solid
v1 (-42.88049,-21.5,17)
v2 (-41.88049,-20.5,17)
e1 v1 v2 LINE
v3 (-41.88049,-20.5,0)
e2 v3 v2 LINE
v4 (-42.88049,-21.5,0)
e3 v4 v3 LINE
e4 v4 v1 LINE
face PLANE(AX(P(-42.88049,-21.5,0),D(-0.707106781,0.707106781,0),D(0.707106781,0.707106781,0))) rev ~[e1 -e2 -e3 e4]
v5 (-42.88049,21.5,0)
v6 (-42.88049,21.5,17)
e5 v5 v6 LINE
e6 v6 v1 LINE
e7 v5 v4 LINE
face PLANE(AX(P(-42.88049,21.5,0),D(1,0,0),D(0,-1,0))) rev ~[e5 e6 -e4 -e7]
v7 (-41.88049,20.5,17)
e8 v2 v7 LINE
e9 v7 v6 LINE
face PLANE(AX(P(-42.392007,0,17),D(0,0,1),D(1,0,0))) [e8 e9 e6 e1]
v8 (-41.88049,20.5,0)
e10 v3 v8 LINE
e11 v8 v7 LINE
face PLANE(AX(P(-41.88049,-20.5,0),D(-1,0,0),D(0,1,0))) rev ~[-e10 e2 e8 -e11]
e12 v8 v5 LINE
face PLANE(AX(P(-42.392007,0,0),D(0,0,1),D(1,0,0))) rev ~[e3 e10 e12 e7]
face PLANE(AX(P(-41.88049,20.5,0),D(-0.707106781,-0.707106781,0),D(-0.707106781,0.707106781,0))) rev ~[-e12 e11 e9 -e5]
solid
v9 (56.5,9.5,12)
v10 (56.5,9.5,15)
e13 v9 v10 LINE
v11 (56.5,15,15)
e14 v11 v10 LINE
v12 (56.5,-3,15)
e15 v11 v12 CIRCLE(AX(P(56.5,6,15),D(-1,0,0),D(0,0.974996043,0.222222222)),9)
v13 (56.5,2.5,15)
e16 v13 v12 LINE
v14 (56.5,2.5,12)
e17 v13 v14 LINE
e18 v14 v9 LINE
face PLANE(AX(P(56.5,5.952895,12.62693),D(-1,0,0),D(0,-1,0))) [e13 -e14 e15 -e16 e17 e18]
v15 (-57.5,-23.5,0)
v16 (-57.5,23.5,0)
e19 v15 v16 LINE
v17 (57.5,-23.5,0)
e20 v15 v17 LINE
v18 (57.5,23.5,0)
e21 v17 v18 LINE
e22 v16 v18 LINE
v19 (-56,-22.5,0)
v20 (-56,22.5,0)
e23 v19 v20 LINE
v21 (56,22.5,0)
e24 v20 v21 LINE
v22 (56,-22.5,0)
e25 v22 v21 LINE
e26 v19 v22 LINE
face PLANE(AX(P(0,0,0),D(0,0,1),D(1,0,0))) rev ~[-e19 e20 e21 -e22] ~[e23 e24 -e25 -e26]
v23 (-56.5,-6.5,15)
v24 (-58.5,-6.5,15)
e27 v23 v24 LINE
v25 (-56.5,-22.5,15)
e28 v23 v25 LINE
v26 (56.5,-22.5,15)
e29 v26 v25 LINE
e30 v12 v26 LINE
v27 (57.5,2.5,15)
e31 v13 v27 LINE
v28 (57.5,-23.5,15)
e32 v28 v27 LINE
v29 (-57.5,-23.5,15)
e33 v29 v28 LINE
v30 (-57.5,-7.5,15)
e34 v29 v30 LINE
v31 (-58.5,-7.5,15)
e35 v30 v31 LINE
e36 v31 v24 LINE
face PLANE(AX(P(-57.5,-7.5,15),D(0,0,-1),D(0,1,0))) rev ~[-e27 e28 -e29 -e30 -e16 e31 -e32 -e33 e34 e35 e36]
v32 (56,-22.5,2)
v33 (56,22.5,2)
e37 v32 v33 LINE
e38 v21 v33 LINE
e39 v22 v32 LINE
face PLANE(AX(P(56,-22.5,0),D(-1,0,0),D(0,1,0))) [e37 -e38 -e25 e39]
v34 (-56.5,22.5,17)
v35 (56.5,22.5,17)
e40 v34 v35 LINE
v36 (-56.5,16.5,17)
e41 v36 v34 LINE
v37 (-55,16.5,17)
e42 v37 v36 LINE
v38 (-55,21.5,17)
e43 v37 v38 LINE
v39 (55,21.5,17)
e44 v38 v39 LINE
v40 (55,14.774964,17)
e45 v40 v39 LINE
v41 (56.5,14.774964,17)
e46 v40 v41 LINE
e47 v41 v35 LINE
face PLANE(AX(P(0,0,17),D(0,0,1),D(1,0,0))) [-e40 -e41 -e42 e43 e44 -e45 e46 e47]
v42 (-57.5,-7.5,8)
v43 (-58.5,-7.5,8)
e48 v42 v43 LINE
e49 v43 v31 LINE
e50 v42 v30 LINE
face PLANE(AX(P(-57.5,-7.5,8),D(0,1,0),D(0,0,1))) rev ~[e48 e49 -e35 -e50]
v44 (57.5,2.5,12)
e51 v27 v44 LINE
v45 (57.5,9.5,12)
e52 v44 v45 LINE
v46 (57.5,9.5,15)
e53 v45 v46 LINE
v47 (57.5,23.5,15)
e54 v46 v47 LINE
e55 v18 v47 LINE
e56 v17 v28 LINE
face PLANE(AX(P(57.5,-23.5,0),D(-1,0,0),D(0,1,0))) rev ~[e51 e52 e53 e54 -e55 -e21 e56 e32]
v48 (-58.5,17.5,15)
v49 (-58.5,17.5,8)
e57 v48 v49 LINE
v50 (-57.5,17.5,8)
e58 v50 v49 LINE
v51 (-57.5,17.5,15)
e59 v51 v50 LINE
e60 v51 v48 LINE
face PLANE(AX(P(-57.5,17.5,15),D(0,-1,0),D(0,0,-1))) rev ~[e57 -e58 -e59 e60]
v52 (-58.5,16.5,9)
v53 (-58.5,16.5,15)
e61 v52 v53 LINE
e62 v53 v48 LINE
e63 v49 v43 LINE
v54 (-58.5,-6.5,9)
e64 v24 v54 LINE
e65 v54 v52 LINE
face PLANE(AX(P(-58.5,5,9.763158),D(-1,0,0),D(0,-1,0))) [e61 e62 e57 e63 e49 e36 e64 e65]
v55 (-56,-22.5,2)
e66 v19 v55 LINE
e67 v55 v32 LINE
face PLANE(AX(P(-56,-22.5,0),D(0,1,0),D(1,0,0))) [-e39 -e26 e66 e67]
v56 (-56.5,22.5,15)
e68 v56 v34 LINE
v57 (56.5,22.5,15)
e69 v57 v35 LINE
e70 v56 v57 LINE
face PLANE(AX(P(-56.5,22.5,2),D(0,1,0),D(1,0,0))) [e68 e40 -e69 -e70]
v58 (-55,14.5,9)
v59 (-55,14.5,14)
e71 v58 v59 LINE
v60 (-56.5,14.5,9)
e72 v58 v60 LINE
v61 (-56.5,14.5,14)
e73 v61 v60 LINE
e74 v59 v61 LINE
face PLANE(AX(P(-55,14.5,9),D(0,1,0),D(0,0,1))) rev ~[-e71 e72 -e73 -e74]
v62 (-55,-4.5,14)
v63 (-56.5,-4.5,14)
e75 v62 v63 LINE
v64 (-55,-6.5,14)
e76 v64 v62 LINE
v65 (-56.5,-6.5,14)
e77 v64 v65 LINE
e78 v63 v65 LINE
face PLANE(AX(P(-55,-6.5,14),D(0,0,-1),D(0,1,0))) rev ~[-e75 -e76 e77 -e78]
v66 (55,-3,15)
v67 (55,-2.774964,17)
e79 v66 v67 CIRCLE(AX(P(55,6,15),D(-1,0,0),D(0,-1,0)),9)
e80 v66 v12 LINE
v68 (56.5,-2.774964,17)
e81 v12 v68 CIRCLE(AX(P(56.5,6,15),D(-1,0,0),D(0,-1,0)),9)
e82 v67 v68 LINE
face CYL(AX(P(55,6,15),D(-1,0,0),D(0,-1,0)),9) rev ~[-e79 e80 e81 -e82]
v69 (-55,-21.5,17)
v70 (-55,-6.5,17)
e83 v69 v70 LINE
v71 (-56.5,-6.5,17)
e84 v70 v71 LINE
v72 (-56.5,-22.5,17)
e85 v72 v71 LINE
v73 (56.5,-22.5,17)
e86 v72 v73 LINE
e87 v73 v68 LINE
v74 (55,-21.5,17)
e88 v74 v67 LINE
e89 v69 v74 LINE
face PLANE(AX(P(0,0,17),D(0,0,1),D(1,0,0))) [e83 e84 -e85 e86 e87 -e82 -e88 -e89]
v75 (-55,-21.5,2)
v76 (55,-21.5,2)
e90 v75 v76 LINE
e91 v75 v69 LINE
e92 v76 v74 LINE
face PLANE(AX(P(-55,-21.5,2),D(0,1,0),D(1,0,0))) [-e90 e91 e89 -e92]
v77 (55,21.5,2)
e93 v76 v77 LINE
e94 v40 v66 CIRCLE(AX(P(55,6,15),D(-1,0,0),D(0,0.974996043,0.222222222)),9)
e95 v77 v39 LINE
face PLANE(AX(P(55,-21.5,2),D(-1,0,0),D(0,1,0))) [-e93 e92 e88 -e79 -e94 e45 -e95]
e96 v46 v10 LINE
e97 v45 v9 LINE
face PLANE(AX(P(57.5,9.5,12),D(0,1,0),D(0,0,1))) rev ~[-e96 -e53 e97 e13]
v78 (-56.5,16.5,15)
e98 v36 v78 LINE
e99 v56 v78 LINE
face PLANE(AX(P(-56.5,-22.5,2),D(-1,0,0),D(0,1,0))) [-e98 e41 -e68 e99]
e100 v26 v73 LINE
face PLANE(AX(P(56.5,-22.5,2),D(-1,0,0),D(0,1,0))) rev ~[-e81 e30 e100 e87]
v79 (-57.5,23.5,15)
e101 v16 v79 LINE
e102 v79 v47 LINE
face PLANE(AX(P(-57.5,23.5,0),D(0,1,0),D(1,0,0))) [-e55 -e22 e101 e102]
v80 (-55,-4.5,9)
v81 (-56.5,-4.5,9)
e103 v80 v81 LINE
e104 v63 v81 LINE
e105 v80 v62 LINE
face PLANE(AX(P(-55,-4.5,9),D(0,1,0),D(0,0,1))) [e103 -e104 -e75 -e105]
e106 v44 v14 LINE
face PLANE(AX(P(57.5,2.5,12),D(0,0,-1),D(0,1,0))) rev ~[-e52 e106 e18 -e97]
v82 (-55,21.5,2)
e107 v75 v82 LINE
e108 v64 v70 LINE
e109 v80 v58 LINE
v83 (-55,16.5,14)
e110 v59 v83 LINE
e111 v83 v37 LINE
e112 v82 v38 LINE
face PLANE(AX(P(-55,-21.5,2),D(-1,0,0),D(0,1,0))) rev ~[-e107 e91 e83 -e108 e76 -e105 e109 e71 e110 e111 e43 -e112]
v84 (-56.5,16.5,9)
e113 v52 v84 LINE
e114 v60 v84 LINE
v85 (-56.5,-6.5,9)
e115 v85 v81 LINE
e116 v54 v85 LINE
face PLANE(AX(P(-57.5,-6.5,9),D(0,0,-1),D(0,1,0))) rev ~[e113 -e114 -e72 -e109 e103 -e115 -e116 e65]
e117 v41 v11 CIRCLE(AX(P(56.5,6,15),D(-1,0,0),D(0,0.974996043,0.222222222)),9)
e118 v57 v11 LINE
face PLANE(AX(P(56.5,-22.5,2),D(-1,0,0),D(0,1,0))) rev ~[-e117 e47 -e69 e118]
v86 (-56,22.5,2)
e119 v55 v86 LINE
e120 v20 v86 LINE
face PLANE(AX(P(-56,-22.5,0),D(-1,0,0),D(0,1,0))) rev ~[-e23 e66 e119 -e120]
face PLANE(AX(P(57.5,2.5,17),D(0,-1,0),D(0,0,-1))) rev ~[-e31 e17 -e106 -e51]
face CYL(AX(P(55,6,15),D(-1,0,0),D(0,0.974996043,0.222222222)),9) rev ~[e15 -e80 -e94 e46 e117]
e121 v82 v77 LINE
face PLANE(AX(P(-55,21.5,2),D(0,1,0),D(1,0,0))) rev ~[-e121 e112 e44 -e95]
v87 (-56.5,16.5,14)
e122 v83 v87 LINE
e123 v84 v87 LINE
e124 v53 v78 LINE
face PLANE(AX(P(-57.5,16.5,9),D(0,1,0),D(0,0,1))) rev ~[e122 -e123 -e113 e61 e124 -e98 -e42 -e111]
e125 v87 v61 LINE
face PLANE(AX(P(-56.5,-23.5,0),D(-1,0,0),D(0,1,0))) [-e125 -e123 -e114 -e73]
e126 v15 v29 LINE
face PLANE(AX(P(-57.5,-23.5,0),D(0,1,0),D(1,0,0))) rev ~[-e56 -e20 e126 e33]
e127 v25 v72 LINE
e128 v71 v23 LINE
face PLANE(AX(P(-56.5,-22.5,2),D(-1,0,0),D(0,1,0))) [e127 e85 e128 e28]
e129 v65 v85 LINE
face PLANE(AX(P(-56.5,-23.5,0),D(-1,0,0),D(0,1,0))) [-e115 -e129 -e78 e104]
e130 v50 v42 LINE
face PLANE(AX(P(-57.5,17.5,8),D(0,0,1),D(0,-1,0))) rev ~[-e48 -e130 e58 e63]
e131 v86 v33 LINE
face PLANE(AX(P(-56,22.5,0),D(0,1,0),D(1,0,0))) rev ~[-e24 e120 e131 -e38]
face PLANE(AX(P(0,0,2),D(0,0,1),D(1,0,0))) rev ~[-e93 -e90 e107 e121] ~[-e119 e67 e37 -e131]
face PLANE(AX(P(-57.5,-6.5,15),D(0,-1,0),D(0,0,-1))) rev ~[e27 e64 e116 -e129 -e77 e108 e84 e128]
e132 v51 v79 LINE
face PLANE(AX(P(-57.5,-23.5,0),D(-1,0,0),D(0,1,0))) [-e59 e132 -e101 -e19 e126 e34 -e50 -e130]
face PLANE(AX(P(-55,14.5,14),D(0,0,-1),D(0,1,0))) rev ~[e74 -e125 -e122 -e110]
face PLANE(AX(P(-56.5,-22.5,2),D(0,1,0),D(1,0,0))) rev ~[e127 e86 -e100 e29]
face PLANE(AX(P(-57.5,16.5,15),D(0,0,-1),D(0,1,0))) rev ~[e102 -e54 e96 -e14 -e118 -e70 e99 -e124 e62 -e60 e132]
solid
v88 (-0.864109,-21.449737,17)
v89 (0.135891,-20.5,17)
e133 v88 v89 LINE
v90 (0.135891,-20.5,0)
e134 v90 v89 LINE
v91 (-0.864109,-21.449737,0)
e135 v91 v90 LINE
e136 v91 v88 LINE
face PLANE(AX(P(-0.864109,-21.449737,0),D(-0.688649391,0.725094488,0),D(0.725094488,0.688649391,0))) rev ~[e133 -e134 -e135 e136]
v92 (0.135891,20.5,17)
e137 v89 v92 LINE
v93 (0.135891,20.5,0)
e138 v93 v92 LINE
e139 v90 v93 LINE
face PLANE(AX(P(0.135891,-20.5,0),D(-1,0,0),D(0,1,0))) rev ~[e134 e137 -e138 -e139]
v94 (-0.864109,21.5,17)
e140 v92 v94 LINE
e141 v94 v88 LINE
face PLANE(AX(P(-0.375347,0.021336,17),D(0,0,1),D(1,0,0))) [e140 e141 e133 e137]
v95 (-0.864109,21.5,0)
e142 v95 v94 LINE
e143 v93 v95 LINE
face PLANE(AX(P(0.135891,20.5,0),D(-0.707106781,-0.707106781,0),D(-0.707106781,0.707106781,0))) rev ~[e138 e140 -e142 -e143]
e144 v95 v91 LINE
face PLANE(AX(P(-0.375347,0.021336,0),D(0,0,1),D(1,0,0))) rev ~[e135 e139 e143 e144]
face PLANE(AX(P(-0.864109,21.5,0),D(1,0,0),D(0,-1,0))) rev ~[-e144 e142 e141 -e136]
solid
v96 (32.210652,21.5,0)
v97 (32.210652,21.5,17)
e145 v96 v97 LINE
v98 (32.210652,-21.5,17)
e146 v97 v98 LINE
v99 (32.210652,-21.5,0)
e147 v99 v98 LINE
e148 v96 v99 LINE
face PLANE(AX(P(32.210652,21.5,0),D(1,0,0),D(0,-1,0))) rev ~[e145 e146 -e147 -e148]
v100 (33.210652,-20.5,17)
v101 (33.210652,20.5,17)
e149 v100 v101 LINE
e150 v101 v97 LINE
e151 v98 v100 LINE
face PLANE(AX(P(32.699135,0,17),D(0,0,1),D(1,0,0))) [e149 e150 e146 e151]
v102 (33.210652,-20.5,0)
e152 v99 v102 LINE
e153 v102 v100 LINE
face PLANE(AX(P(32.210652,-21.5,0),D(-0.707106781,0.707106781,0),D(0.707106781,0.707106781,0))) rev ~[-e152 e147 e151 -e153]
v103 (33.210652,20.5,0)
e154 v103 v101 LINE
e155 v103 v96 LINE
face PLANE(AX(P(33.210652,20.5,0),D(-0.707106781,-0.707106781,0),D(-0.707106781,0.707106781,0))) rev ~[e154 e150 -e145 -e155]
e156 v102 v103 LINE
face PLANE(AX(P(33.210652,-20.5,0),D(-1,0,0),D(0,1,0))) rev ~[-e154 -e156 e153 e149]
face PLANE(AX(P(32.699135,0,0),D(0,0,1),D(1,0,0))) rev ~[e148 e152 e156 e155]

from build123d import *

# Parameters (mm, degrees)
F0_W      = 115
F0_H      = 47
F0_W_2    = 112
F0_H_2    = 45
F1_DEPTH  = 15
F3_W      = 113
F3_H      = 45
F3_W_2    = 110
F3_H_2    = 43
F4_DEPTH  = 15
F5_W      = 7
F5_H      = 2
F5_H_2    = 3
F6_DEPTH  = 25
F8_DEPTH  = 1.5
F9_W      = 2
F9_H      = 3
F9_W_2    = 19
F9_H_2    = 5
F10_DEPTH = 25
F12_DEPTH = 1
F13_DEPTH = 1
F15_DEPTH = 17


with BuildPart() as f1:
    # F0 (on Top) → F1 (new body)
    with BuildSketch(Plane.XY):
        Rectangle(F0_W, F0_H)
        Rectangle(F0_W_2, F0_H_2, mode=Mode.SUBTRACT)
    extrude(amount=F1_DEPTH)

    # F3 (on offset) → F4 (join)
    with BuildSketch(Plane.XY.offset(2)):
        Rectangle(F3_W, F3_H)
        Rectangle(F3_W_2, F3_H_2, mode=Mode.SUBTRACT)
    extrude(amount=F4_DEPTH)

    # F5 (on face) → F6 (cut)
    with BuildSketch(Plane.YZ.offset(57.5)):
        with Locations((6, 16)):
            Rectangle(F5_W, F5_H)
        with Locations((6, 13.5)):
            Rectangle(F5_W, F5_H_2)
    extrude(amount=-F6_DEPTH, mode=Mode.SUBTRACT)

    # F7 (on face) → F8 (cut)
    with BuildSketch(Plane(origin=(55, 0, 0), x_dir=(0, -1, 0), z_dir=(-1, 0, 0))):
        with BuildLine():
            ThreePointArc((-14.7749643874, 17), (-7.0063102189, 6.0564358479), (3, 15))
            ThreePointArc((3, 15), (2.9435641521, 16.0063102189), (2.7749643874, 17))
            Line((2.7749643874, 17), (-2.5, 17))
            Line((-2.5, 17), (-2.5, 12))
            Line((-2.5, 12), (-9.5, 12))
            Line((-9.5, 12), (-9.5, 17))
            Line((-9.5, 17), (-14.7749643874, 17))
        make_face()
        with BuildLine():
            Line((-2.5, 17), (2.7749643874, 17))
            ThreePointArc((2.7749643874, 17), (-6, 24), (-14.7749643874, 17))
            Line((-14.7749643874, 17), (-9.5, 17))
            Line((-9.5, 17), (-9.5, 12))
            Line((-9.5, 12), (-2.5, 12))
            Line((-2.5, 12), (-2.5, 17))
        make_face()
    extrude(amount=-F8_DEPTH, mode=Mode.SUBTRACT)

    # F9 (on face) → F10 (cut)
    with BuildSketch(Plane.YZ.offset(-55)):
        with Locations((-5.5, 15.5)):
            Rectangle(F9_W, F9_H)
        with Locations((5, 11.5)):
            Rectangle(F9_W_2, F9_H_2)
        with Locations((15.5, 15.5)):
            Rectangle(F9_W, F9_H)
        with Locations((5, 15.5)):
            Rectangle(F9_W_2, F9_H)
    extrude(amount=-F10_DEPTH, mode=Mode.SUBTRACT)

    # F11 (on face) → F12 (join)
    with BuildSketch(Plane(origin=(-57.5, 0, 0), x_dir=(0, -1, 0), z_dir=(-1, 0, 0))):
        Polygon((-16.5, 15), (-17.5, 15), (-17.5, 8), (7.5, 8), (7.5, 15), (6.5, 15), (6.5, 14), (6.5, 9), (4.5, 9), (-14.5, 9), (-16.5, 9), (-16.5, 14), align=None)
    extrude(amount=F12_DEPTH)

    # F13 (cut): faces of the model
    f13_faces = [f1.faces().sort_by_distance(p)[0] for p in [
        (-57.5, 15.5, 11.5),
        (-57.5, -5.5, 11.5),
    ]]
    extrude(f13_faces, amount=-F13_DEPTH, mode=Mode.SUBTRACT)


with BuildPart() as f15:
    # F14 (on Top) → F15 (new body)
    with BuildSketch(Plane.XY):
        Polygon((-41.8804898377, 20.5), (-42.8804898377, 21.5), (-42.8804898377, -21.5), (-41.8804898377, -20.5), align=None)
    extrude(amount=F15_DEPTH)


with BuildPart() as f15b:
    # F14 (on Top) → F15, piece 2 (new body)
    with BuildSketch(Plane.XY):
        Polygon((0.1358912904, 20.5), (-0.8641087096, 21.5), (-0.8641087096, -21.449737452), (0.1358912904, -20.5), align=None)
    extrude(amount=F15_DEPTH)


with BuildPart() as f15c:
    # F14 (on Top) → F15, piece 3 (new body)
    with BuildSketch(Plane.XY):
        Polygon((33.2106517851, 20.5), (32.2106517851, 21.5), (32.2106517851, -21.5), (33.2106517851, -20.5), align=None)
    extrude(amount=F15_DEPTH)


solid = Compound([f1.part, f15.part, f15b.part, f15c.part])
